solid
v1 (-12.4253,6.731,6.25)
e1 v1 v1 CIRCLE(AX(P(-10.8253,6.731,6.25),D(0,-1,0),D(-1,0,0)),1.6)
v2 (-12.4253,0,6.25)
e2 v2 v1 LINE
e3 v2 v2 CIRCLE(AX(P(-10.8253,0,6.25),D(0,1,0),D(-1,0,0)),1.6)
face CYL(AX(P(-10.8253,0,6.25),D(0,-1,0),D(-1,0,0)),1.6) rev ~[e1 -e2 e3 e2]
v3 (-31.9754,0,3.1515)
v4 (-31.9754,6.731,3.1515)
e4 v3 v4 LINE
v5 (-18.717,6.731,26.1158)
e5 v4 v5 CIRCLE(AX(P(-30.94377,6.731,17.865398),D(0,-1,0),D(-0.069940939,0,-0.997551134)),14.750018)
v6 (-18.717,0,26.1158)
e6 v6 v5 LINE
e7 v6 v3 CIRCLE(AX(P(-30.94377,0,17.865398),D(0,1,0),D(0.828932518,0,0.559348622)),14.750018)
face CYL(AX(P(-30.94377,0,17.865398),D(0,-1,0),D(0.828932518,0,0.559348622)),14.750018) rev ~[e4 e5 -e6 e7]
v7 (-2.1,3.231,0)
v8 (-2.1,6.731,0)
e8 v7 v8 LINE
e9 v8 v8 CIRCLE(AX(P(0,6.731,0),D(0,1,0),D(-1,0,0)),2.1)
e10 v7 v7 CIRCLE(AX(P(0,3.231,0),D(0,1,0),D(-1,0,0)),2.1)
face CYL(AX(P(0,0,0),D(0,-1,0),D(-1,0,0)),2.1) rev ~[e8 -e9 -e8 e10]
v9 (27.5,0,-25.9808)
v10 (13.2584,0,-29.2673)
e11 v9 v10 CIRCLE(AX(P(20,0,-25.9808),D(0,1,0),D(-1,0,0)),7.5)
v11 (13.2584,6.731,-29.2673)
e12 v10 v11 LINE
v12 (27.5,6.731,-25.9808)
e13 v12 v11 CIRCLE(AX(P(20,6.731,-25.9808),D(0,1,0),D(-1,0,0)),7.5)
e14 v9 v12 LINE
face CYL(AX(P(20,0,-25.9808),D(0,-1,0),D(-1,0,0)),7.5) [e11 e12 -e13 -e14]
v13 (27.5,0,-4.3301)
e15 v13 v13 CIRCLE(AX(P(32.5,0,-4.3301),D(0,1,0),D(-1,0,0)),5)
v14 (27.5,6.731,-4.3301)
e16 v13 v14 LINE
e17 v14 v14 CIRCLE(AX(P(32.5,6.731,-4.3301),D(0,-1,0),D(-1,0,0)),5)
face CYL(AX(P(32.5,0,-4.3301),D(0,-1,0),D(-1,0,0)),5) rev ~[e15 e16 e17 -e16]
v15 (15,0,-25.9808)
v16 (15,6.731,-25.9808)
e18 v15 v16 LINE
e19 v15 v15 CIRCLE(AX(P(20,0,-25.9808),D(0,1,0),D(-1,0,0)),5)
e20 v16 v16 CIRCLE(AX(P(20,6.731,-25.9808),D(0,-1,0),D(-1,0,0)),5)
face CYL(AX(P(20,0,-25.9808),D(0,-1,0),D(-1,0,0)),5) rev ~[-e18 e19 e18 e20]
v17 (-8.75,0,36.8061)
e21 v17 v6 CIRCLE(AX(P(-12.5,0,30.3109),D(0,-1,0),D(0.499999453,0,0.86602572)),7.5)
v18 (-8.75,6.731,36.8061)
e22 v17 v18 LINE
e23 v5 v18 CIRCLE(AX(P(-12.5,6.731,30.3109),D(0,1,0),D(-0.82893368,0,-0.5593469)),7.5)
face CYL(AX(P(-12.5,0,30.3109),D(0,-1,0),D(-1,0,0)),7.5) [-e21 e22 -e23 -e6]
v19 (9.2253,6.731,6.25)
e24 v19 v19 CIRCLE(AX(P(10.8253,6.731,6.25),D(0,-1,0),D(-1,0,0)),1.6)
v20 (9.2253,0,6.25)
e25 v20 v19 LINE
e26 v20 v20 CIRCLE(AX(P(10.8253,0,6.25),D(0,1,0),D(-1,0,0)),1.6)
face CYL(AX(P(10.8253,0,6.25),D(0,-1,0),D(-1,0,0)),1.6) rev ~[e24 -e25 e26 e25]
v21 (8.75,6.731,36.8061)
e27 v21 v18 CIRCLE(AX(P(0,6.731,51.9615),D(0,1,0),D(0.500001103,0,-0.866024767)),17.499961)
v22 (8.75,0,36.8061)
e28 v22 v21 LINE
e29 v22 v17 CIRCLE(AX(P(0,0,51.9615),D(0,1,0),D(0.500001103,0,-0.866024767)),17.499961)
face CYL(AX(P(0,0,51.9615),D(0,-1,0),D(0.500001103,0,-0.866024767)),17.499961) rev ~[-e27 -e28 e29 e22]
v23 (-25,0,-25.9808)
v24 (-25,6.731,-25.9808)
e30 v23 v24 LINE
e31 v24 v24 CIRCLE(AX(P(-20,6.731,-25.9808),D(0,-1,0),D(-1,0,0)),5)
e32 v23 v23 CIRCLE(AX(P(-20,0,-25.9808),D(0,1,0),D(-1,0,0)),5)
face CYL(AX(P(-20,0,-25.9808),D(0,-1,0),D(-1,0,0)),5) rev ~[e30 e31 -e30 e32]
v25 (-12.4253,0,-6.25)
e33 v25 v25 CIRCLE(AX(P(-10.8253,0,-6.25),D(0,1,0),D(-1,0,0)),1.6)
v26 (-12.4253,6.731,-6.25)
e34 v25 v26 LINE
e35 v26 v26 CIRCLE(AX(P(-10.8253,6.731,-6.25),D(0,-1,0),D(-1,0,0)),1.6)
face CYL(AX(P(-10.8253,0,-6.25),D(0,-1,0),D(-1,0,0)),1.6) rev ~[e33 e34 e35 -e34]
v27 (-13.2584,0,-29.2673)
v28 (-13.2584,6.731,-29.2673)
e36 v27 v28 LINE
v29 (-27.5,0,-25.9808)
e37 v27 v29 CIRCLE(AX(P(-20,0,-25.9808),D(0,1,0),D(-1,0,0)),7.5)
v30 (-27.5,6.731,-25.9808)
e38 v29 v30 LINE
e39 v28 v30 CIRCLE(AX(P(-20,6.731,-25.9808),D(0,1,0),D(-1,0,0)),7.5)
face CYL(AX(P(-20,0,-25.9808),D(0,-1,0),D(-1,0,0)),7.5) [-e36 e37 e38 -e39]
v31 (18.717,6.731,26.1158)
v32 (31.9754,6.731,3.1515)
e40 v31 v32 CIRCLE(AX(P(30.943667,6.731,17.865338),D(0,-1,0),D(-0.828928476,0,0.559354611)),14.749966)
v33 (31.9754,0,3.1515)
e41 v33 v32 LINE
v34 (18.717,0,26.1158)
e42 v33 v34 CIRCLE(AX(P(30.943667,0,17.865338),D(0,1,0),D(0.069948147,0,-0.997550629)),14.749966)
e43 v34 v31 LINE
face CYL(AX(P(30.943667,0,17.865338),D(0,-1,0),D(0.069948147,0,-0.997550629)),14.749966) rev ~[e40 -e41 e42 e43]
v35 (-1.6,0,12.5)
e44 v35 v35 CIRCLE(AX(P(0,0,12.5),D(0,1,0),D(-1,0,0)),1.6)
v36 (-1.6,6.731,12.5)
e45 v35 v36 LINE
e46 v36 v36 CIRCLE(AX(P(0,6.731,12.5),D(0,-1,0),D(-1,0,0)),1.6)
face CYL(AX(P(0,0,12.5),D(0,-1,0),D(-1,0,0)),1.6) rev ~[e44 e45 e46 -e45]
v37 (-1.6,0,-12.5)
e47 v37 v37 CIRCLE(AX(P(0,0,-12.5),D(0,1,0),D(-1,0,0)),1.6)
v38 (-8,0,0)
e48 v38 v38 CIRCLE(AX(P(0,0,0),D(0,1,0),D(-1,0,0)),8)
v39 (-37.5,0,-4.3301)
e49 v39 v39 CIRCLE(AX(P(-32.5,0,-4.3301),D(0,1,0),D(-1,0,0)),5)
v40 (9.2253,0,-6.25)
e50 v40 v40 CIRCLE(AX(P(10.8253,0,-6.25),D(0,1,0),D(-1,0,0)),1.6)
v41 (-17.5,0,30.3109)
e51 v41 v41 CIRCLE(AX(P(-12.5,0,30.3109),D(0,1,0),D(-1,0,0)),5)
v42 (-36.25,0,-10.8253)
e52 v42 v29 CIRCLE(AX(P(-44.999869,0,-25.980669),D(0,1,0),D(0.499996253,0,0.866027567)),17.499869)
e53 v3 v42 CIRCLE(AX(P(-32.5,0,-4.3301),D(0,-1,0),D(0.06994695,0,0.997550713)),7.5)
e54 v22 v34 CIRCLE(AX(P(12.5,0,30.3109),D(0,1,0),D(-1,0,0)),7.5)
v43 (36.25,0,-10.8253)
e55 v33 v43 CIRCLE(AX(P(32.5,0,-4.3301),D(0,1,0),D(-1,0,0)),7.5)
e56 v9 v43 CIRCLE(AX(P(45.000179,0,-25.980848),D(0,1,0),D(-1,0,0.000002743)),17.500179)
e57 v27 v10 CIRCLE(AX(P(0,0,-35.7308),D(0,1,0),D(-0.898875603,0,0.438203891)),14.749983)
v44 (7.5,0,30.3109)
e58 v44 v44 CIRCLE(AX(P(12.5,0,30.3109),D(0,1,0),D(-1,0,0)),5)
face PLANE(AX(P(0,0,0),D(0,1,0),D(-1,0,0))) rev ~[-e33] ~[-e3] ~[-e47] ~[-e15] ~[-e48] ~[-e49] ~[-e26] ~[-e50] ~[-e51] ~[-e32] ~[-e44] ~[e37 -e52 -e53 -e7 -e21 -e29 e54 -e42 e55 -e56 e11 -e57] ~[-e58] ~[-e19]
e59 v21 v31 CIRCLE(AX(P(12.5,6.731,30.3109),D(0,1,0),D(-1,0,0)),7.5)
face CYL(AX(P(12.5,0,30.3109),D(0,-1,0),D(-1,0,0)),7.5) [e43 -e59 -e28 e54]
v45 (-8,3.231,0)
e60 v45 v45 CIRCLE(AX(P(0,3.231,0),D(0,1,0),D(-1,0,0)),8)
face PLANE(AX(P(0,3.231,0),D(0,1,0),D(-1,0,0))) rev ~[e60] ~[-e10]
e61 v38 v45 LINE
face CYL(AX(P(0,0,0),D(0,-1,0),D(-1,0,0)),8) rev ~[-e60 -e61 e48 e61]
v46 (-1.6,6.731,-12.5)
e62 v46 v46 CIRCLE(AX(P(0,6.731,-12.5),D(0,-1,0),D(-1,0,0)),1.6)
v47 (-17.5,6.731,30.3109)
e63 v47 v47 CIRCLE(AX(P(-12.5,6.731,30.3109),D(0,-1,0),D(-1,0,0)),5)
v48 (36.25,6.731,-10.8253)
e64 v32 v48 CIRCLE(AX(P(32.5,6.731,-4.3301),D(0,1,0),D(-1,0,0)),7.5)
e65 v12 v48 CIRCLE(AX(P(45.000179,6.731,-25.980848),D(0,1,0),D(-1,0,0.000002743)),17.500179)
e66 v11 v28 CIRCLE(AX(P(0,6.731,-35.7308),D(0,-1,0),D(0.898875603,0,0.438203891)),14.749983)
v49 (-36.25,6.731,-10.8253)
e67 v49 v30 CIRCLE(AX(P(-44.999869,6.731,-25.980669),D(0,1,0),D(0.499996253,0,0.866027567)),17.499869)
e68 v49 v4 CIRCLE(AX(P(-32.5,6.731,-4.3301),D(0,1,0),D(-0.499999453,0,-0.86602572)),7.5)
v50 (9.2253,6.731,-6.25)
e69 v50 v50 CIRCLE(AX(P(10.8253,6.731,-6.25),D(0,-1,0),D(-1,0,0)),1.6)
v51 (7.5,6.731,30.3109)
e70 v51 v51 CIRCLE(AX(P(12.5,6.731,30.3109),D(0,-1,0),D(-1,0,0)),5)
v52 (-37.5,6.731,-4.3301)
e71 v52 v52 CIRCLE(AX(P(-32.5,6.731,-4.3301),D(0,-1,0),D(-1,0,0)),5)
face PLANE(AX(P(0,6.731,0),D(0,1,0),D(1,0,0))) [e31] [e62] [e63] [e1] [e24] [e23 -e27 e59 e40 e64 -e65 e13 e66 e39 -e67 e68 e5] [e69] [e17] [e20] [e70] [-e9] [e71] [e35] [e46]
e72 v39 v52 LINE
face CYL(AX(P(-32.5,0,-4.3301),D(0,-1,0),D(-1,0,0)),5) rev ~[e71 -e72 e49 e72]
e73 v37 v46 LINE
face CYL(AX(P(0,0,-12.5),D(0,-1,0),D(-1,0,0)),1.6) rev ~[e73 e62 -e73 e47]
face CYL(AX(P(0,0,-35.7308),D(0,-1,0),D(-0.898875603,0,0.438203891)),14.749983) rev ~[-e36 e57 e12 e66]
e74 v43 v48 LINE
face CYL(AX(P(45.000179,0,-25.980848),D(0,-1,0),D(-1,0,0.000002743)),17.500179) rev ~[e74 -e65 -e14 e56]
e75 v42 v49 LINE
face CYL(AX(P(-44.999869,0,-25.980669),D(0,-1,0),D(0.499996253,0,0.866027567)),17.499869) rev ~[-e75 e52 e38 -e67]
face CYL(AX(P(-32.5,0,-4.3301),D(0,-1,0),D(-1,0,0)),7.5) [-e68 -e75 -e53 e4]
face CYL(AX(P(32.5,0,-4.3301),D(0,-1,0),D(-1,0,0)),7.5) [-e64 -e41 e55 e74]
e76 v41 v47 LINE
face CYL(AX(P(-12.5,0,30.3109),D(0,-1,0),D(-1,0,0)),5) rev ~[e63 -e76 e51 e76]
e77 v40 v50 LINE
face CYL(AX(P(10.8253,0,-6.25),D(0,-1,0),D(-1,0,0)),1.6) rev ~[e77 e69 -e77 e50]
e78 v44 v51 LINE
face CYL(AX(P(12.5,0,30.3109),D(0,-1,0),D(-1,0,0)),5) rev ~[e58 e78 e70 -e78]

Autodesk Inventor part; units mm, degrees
ref_plane "YZ Plane" through (0, 0, 0) normal (1, 0, 0) x (0, 1, 0)
ref_plane "XZ Plane" through (0, 0, 0) normal (0, 1, 0) x (-1, 0, 0)
ref_plane "XY Plane" through (0, 0, 0) normal (0, 0, 1) x (1, 0, 0)
sketch "Sketch1" plane through (0, 0, 0) normal (0, 1, 0) x (-1, 0, 0)
  circle A0 centre (0, 0) radius 2.1
  circle A1 centre (0, 0) radius 8
  circle A2 centre (0, 0) radius 12.5
  circle A3 centre (0, 0) radius 51.9615
  line L0 (-45, -25.9808) -> (-28.034, 3.4052)
  line L1 (0, 51.9615) -> (16.966, 22.5755)
  line L2 (45, -25.9808) -> (11.068, -25.9808)
  circle A4 centre (12.5, 30.3109) radius 5
  circle A5 centre (32.5, -4.3301) radius 5
  circle A6 centre (-12.5, 30.3109) radius 5
  circle A7 centre (-32.5, -4.3301) radius 5
  circle A8 centre (-20, -25.9808) radius 5
  circle A9 centre (20, -25.9808) radius 5
  circle A10 centre (0, 12.5) radius 1.6
  circle A11 centre (-10.8253, 6.25) radius 1.6
  circle A12 centre (-10.8253, -6.25) radius 1.6
  circle A13 centre (0, -12.5) radius 1.6
  circle A14 centre (10.8253, -6.25) radius 1.6
  circle A15 centre (10.8253, 6.25) radius 1.6
  circle A16 centre (-32.5, -4.3301) radius 7.5
  circle A17 centre (-12.5, 30.3109) radius 7.5
  circle A18 centre (12.5, 30.3109) radius 7.5
  circle A19 centre (32.5, -4.3301) radius 7.5
  circle A20 centre (20, -25.9808) radius 7.5
  circle A21 centre (-20, -25.9808) radius 7.5
  arc A22 (-8.75, 36.8061) -> (8.75, 36.8061) centre (0, 51.9615) ccw
  arc A23 (-27.5, -25.9808) -> (-36.25, -10.8253) centre (-45, -25.9808) ccw
  arc A24 (36.25, -10.8253) -> (27.5, -25.9808) centre (45, -25.9808) ccw
  arc A25 (13.2584, -29.2673) -> (-13.2584, -29.2673) centre (0, -35.7308) ccw
  arc A26 (-31.9754, 3.1515) -> (-18.717, 26.1158) centre (-30.9437, 17.8654) ccw
  arc A27 (18.717, 26.1158) -> (31.9754, 3.1515) centre (30.9437, 17.8654) ccw
  line L3 (-16.966, 22.5755) -> (0, 51.9615)
  line L4 (-28.034, 3.4052) -> (-16.966, 22.5755)
  line L5 (-11.068, -25.9808) -> (-45, -25.9808)
  line L6 (11.068, -25.9808) -> (-11.068, -25.9808)
  line L7 (16.966, 22.5755) -> (28.034, 3.4052)
  line L8 (28.034, 3.4052) -> (45, -25.9808)
  circle A28 centre (14.0253, 0) radius 1.6
  point P0 (-28.75, 2.1651)
  point P1 (-16.25, 23.8157)
  point P2 (16.25, 23.8157)
  point P3 (28.75, 2.1651)
  point P4 (12.5, -25.9808)
  point P5 (-12.5, -25.9808)
  dimension "d4" = 25
  dimension "d0" = 4.2
  dimension "d3" = 16
  dimension "d11" = 90
  dimension "d12" = 40
  dimension "d13" = 10
  dimension "d14" = 25
  dimension "d15" = 25
  dimension "d16" = 40
  dimension "d17" = 40
  dimension "d18" = 25
  dimension "d19" = 25
  dimension "d26" = 3.2
  dimension "d29" = 360
  dimension "d38" = 15
  dimension "d47" = 5
  dimension "d48" = 90
  dimension "d49" = 90
  dimension "d50" = 6.25
  dimension "d51" = 3.2
extrude "Shape" add sketch "Sketch1" along normal blind 6.731 contours A1 | A2 A28 | A2 A28 | A28 A2 A14 A13 A12 A11 A10 A15 | A15 A2 | A2 A15 | A14 A2 | A2 A14 | A10 A2 | A2 A10 | A13 A2 | A2 A13 | A11 A2 | A2 A11 | A12 A2 | A2 A12 | A18 L1 A4 | L1 A4 A18 | A18 L1 A27 L8 A19 A24 A20 L2 A25 L5 A21 A23 A16 L0 A26 L3 A17 A22 | L3 A6 A17 | A17 L3 A6 | A20 L2 A9 | L2 A9 A20 | L8 A5 A19 | A19 L8 A5 | A16 L0 A7 | L0 A7 A16 | L5 A8 A21 | A21 L5 A8 | A4 L1 | L1 A4 | A18 A27 L1 | A17 L3 A26 | L3 A6 | A6 L3 | A9 L2 | L2 A9 | A25 L2 A20 | L8 A27 A19 | L8 A5 | A5 L8 | A7 L0 | L0 A7 | A26 L0 A16 | L5 A25 A21 | L5 A8 | A8 L5
extrude "Holes" cut sketch "Sketch1" along normal up to next contours A2 A28 | A2 A28 | A15 A2 | A2 A15 | A14 A2 | A2 A14 | A10 A2 | A2 A10 | A13 A2 | A2 A13 | A11 A2 | A2 A11 | A12 A2 | A2 A12 | A4 L1 | L1 A4 | L3 A6 | A6 L3 | A9 L2 | L2 A9 | L8 A5 | A5 L8 | A7 L0 | L0 A7 | L5 A8 | A8 L5
extrude "Inset" cut sketch "Sketch1" along normal blind 3.231 contours A1
sketch "Sketch2" plane through (0, 6.731, 0) normal (0, 1, 0) x (1, 0, 0)
  circle A0 centre (-14.0253, 0) radius 1.6 projected
extrude "Extrusion7" add sketch "Sketch2" against normal up to surface (6.731 mm away)
equation "\"d14\" = d15"
equation "\"d16\" = d12"
equation "\"d17\" = d12"
equation "\"d18\" = d14"
equation "\"d19\" = d14"
equation "\"d48\" = d11"
equation "\"d49\" = d11"
equation "\"d43\" = THICKB"
equation "\"THICKA\" = 3.175"
equation "\"THICKB\" = 6.731"
equation "\"THICKC\" = 12.7"
equation "\"MAGDIA\" = 9.5"
equation "\"BALLDIA\" = 12"
properties part number "Effector_Platform"
